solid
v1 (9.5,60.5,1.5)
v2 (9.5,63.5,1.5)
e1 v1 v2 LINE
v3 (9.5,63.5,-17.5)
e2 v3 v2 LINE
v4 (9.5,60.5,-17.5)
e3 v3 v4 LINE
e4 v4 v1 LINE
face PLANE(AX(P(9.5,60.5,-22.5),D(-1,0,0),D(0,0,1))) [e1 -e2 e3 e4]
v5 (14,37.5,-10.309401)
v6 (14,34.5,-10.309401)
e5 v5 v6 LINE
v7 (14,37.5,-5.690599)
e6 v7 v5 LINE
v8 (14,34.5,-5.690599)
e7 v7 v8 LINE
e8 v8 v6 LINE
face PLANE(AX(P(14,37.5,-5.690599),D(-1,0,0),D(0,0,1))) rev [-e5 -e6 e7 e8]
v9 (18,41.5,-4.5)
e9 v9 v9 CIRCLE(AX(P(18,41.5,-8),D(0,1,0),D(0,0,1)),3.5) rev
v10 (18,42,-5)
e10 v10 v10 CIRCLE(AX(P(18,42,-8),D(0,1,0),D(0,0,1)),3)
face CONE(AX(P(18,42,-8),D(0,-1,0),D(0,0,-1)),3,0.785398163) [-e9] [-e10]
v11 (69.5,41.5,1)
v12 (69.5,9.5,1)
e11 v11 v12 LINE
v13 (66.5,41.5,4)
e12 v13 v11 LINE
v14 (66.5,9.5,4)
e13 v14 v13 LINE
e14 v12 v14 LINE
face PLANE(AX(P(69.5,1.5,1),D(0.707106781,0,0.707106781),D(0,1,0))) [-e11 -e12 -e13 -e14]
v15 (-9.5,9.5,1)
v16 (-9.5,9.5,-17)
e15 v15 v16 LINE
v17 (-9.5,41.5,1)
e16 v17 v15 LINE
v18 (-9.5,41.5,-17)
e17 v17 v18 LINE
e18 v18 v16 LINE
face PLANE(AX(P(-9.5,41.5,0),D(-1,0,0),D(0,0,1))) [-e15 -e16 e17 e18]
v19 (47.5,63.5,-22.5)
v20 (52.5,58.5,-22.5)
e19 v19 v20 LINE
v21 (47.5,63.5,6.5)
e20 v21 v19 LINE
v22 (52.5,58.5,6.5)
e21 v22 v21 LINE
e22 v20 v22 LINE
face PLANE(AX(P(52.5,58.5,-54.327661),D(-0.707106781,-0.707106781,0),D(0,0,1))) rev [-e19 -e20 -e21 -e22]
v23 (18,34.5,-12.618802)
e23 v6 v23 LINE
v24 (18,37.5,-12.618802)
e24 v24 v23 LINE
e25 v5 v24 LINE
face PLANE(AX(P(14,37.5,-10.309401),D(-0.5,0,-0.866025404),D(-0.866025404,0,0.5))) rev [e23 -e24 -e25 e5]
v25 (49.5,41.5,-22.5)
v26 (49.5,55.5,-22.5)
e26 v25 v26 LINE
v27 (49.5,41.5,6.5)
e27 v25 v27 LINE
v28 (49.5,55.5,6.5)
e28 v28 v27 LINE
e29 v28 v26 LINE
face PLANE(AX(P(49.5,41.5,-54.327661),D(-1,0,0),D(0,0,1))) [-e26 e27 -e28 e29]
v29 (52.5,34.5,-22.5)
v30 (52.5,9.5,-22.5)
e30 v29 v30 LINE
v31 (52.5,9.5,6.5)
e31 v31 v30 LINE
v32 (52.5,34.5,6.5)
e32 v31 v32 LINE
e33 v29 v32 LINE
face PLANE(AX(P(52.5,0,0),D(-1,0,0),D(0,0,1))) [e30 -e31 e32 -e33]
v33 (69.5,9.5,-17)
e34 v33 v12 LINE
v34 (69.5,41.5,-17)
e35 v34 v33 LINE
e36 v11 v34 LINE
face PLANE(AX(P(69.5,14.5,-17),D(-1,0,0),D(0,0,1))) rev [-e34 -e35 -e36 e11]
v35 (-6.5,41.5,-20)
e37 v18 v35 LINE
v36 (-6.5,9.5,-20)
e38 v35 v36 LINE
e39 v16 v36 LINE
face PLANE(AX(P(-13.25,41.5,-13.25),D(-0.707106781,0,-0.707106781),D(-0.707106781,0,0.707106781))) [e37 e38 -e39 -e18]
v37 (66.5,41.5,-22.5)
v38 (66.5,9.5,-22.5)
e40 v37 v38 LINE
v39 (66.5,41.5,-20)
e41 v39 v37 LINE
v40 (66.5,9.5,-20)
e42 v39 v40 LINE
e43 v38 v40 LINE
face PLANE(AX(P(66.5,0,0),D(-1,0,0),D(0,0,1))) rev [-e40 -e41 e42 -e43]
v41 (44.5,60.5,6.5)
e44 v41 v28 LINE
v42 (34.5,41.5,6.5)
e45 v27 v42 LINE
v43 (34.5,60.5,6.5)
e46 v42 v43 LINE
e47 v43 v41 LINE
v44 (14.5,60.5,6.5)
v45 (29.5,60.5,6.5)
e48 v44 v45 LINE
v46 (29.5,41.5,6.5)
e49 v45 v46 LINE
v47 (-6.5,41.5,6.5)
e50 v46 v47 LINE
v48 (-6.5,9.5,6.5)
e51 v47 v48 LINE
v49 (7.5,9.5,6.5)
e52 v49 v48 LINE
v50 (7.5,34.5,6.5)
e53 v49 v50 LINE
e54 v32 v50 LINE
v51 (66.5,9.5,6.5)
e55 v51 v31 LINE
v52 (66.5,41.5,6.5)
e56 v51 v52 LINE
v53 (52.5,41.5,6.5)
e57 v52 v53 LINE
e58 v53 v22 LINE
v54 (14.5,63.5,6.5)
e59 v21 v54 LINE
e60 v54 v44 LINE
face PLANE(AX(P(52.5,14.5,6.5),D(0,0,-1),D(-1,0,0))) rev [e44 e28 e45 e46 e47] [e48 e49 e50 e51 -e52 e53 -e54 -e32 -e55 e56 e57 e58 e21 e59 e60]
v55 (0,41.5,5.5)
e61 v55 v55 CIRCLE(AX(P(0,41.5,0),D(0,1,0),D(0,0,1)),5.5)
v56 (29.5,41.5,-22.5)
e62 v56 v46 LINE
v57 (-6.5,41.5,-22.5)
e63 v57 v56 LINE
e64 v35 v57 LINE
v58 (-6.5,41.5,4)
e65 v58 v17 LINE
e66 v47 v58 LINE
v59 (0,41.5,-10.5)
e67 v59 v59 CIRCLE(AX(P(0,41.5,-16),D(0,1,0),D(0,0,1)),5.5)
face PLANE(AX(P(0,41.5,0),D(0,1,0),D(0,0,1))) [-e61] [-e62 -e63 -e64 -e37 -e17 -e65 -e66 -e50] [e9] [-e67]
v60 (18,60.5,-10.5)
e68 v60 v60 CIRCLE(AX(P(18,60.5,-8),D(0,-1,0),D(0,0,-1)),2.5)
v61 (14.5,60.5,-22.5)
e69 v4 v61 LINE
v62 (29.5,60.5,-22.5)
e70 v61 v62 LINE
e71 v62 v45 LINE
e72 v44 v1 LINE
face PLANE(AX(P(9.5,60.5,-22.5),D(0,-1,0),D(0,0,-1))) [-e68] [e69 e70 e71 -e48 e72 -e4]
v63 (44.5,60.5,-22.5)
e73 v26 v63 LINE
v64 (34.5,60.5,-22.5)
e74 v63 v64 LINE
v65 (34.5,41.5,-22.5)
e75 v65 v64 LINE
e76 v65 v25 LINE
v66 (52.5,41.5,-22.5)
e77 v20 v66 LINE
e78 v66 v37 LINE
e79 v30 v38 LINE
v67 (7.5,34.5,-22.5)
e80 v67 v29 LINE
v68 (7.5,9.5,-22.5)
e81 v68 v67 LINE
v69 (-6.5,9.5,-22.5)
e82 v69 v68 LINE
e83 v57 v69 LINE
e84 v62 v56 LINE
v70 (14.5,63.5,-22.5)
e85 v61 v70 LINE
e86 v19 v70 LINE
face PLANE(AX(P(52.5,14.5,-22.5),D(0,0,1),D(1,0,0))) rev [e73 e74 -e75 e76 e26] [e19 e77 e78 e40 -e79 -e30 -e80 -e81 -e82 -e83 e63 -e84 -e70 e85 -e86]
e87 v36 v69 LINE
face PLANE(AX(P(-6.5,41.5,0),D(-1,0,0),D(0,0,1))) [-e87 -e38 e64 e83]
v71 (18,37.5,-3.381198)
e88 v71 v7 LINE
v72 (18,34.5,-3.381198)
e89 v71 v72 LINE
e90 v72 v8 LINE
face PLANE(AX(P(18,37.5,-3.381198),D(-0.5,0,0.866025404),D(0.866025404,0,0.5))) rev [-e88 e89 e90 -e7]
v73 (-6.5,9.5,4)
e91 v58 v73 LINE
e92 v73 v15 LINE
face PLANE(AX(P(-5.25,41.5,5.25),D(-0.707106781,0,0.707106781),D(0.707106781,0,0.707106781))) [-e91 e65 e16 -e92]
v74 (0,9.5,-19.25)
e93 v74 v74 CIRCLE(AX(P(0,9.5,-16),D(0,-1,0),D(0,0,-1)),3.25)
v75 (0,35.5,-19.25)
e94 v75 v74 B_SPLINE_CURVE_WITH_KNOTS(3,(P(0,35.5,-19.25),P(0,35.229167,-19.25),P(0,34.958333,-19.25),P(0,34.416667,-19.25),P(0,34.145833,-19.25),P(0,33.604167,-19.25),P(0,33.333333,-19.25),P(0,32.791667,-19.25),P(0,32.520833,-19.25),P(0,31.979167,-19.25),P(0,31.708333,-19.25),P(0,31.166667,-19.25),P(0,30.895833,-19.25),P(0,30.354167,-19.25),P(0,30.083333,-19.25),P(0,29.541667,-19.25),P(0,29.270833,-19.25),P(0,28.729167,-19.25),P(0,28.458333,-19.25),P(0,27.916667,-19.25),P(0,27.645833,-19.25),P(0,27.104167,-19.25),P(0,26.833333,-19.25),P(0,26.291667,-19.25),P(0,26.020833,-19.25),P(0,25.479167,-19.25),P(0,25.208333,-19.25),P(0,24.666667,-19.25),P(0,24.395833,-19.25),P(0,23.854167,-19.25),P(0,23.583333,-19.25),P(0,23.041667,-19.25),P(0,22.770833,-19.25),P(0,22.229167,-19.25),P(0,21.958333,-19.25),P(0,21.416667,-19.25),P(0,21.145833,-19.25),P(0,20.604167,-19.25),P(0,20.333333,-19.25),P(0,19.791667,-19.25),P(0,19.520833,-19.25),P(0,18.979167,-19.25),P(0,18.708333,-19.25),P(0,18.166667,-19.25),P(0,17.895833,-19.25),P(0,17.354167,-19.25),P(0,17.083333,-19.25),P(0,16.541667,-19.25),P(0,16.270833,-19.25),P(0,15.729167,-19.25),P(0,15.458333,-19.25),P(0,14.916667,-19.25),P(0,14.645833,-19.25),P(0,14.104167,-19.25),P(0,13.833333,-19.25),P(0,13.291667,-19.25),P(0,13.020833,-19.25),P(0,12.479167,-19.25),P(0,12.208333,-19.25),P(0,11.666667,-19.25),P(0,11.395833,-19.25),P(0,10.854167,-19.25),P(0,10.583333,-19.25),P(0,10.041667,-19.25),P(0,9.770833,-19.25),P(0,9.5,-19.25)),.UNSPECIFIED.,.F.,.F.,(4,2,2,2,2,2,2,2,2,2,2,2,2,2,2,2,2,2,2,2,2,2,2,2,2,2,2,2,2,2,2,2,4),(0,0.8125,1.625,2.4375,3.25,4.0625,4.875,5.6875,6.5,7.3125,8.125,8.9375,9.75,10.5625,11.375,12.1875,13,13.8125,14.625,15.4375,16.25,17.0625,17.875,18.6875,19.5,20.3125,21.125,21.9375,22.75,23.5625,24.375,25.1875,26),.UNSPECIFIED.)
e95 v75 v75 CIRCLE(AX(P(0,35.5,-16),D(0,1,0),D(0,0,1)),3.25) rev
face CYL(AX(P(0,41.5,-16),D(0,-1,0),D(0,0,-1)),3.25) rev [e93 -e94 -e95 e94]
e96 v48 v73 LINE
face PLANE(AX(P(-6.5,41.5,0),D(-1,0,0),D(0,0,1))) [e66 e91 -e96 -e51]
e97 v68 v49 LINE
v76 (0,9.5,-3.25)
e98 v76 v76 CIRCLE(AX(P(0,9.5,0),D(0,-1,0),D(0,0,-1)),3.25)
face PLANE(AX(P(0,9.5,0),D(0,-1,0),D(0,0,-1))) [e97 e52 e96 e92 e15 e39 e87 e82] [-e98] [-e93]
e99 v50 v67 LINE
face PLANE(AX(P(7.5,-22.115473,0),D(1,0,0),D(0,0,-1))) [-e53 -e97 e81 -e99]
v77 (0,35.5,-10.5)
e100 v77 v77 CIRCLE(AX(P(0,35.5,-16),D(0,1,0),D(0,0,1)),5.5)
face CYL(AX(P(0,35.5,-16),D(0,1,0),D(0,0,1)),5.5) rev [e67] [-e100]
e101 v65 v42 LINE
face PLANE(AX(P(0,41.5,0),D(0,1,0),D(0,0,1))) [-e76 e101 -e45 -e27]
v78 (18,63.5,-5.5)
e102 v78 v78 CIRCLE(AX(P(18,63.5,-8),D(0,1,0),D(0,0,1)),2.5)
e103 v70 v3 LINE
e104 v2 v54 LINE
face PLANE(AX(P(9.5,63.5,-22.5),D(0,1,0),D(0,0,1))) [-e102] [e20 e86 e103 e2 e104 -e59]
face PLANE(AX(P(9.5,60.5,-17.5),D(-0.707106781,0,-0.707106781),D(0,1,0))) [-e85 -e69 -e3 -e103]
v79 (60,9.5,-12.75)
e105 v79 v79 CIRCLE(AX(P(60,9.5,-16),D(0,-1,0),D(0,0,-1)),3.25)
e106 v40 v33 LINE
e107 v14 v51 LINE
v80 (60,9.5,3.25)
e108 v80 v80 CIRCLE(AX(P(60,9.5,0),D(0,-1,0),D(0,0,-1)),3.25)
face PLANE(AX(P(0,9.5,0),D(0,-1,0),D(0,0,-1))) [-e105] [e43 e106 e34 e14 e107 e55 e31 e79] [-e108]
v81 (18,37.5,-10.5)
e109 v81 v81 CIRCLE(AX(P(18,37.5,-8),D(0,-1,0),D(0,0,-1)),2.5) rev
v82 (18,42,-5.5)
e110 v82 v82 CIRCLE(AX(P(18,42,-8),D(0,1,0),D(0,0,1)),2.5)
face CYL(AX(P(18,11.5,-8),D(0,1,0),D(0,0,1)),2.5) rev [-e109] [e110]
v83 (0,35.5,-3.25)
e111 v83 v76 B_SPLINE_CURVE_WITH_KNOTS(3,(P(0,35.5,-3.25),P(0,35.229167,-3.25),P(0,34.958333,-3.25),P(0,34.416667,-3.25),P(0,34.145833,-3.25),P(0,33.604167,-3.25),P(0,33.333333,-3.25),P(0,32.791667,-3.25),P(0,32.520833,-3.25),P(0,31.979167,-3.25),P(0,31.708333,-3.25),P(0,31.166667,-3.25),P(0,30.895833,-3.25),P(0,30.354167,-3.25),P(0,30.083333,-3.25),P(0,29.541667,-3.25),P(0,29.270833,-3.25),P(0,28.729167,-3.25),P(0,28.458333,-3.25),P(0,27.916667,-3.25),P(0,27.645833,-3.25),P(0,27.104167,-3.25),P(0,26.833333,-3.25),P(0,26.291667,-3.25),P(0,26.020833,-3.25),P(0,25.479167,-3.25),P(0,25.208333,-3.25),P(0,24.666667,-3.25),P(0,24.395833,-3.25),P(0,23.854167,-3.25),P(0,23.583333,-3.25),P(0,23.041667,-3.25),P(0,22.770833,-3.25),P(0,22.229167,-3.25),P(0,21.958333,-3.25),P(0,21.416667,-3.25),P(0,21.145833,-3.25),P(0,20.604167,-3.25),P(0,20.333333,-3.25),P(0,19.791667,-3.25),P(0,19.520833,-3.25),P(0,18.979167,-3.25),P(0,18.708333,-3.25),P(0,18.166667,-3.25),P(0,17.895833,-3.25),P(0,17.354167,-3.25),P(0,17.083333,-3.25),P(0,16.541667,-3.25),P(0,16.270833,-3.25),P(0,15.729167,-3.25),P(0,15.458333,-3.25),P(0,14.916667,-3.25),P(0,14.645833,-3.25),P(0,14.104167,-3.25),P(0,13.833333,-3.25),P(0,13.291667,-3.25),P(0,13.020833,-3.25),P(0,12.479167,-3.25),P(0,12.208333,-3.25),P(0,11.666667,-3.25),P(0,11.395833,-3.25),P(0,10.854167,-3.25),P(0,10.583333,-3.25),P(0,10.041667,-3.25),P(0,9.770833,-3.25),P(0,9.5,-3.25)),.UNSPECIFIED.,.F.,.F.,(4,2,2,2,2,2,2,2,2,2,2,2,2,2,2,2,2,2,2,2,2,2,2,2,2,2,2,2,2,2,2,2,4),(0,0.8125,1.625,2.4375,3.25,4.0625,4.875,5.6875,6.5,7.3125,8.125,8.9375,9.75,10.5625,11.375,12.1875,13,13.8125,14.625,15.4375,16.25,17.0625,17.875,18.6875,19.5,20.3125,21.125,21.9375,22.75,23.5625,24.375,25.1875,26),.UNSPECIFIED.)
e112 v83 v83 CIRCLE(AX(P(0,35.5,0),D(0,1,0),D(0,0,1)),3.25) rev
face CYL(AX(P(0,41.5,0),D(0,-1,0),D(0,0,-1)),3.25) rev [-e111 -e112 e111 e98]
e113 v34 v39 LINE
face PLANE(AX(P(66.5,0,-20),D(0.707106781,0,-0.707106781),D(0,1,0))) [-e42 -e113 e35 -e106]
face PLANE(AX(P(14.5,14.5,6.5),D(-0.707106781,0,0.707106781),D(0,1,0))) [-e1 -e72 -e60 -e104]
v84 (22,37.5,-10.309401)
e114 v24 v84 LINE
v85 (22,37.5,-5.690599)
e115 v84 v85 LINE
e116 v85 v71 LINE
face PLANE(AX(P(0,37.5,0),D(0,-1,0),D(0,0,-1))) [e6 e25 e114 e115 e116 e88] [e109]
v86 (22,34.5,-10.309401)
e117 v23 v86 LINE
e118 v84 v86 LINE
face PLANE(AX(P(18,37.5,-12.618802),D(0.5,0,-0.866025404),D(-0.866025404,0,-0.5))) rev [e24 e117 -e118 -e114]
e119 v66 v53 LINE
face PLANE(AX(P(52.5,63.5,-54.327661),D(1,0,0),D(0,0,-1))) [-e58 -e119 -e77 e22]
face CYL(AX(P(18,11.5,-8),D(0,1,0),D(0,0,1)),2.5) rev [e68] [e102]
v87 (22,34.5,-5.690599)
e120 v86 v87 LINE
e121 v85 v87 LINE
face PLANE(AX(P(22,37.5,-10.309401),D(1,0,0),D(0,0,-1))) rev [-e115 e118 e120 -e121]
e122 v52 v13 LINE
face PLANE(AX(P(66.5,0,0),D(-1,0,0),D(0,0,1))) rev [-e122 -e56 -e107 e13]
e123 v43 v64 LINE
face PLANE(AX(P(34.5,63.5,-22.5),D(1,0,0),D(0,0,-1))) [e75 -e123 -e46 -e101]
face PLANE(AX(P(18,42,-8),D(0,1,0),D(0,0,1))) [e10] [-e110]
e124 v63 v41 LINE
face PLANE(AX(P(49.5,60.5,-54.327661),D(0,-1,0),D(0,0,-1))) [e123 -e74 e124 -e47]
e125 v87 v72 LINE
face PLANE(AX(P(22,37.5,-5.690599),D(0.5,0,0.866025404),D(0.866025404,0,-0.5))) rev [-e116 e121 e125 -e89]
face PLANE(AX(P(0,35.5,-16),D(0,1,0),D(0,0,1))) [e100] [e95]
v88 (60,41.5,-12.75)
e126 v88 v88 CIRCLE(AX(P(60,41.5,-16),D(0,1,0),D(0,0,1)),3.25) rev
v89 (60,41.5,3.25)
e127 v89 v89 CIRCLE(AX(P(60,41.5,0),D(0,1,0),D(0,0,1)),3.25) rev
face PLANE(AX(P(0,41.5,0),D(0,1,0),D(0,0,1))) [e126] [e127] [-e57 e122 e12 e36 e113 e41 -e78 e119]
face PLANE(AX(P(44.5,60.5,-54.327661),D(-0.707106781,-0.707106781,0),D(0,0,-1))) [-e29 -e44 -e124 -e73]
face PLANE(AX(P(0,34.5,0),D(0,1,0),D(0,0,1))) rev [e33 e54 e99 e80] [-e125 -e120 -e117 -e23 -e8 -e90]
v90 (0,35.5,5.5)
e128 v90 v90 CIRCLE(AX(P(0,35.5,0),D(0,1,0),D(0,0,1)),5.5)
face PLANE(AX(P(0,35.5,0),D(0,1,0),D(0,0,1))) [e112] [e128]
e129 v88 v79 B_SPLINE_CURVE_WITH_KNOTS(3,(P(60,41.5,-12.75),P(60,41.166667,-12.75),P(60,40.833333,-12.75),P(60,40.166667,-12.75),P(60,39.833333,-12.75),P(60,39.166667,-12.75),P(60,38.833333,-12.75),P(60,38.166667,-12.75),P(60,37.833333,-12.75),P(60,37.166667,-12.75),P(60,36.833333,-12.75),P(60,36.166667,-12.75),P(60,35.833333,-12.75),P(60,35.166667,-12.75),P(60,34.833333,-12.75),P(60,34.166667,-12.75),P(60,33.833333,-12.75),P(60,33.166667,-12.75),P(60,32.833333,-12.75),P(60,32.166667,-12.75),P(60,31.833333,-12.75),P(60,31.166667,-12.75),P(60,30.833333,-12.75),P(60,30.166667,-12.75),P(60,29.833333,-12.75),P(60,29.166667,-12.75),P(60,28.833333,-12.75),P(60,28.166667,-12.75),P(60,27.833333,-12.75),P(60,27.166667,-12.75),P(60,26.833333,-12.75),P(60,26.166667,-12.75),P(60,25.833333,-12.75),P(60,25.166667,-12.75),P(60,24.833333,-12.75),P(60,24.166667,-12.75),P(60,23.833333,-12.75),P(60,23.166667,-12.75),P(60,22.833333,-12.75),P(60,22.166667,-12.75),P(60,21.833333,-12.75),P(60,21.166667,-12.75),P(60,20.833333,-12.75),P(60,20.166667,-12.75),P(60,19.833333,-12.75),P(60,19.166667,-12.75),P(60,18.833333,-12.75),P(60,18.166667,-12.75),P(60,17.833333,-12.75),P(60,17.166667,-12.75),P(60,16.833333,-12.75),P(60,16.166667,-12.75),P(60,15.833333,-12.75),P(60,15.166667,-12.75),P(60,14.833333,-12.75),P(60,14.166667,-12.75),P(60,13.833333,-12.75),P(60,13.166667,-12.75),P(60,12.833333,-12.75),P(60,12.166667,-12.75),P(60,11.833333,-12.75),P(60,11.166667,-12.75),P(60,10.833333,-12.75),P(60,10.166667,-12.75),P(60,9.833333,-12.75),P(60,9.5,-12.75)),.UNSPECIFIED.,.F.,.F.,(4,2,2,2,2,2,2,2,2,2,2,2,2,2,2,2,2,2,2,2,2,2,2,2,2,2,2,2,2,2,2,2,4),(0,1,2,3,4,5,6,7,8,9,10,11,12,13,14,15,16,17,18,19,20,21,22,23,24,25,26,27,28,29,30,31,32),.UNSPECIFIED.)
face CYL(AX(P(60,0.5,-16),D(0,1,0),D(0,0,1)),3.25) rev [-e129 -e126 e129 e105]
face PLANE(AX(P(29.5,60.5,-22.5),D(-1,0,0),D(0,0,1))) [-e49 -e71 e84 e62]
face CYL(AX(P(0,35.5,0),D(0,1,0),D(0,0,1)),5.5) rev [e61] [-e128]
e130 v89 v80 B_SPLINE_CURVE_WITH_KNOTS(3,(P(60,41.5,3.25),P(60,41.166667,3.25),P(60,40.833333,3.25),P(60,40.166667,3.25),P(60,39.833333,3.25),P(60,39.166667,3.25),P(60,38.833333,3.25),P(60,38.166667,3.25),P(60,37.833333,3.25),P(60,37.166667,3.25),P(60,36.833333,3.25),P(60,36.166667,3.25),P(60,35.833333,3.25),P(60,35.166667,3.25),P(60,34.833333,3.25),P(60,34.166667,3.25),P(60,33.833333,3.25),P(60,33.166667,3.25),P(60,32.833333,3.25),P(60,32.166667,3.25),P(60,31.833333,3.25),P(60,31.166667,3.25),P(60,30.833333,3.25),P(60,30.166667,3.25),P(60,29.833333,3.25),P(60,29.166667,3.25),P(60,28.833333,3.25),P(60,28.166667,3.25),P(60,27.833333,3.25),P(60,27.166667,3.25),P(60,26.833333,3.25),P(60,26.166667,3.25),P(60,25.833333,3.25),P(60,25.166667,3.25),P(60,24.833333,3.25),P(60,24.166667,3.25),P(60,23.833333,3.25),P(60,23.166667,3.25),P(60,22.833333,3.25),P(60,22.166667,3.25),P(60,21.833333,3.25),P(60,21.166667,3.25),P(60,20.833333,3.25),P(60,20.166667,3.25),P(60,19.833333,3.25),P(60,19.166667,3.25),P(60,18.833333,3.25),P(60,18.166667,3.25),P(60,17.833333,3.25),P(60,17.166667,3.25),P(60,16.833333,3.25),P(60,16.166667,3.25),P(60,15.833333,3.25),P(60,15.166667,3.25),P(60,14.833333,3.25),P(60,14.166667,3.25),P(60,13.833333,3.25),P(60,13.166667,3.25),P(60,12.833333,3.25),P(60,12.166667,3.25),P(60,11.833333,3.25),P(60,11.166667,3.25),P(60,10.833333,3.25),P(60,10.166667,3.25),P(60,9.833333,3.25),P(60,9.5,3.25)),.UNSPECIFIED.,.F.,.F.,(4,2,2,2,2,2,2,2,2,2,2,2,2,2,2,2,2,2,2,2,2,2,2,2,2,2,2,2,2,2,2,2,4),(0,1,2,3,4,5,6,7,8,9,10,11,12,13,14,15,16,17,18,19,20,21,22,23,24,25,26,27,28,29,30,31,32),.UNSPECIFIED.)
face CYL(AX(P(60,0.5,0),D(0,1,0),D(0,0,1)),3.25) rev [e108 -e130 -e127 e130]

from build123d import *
from build123d.topology import SkipClean

# Parameters (mm, degrees)
SKETCH1_W               = 44.05184454
SKETCH1_H               = 18
BOSS_EXTRUDE1_DEPTH     = 1.5
SKETCH2_W               = 3
SKETCH2_H               = 18
BOSS_EXTRUDE2_DEPTH     = 13
SKETCH3_W               = 29
SKETCH3_H               = 3
BOSS_EXTRUDE3_DEPTH     = 14
CHAMFER1_SIZE           = 3
SKETCH4_R               = 3.25
CUT_EXTRUDE1_DEPTH      = 14
BOSS_EXTRUDE4_START     = 20
SKETCH5_R               = 3.25
BOSS_EXTRUDE4_DEPTH     = 20
BOSS_EXTRUDE5_START     = 7
SKETCH6_R               = 3.25
SKETCH6_W               = 22.5
SKETCH6_H               = 29
BOSS_EXTRUDE5_DEPTH     = 7
SKETCH8_R               = 3.25
BOSS_EXTRUDE6_DEPTH     = 23
BOSS_EXTRUDE8_DEPTH     = 29
SKETCH9_R               = 38.719812757
CUT_EXTRUDE2_DEPTH      = 11.5
CUT_EXTRUDE3_DEPTH      = 79.971513852
CUT_EXTRUDE3_DEPTH_BACK = 79.971513852
SKETCH10_R              = 2.5
CUT_EXTRUDE4_DEPTH      = 3
SKETCH12_R              = 3
SKETCH12_R_2            = 2.5
BOSS_EXTRUDE7_DEPTH     = 0.5
CHAMFER2_SIZE           = 0.5
SKETCH17_R              = 5.5
CUT_EXTRUDE5_DEPTH      = 6
CHAMFER3_SIZE           = 5
BOSS_EXTRUDE9_DEPTH     = 29
CHAMFER4_SIZE           = 5
SKETCH20_R              = 3.25
BOSS_EXTRUDE10_DEPTH    = 2


with BuildPart() as part:
    # Sketch1 → Boss-Extrude1 (new body)
    with BuildSketch(Plane(origin=(0, 0, 0), x_dir=(1, 0, 0), z_dir=(0, 1, 0))):
        with Locations((88.52592227, 8)):
            Rectangle(SKETCH1_W, SKETCH1_H)
        with BuildLine():
            Line((99.736944586, 5.75), (95.736944586, 5.75))
            ThreePointArc((95.736944586, 5.75), (93.486944586, 8), (95.736944586, 10.25))
            Line((95.736944586, 10.25), (99.736944586, 10.25))
            ThreePointArc((99.736944586, 10.25), (101.986944586, 8), (99.736944586, 5.75))
        make_face(mode=Mode.SUBTRACT)
    extrude(amount=BOSS_EXTRUDE1_DEPTH)

    # Sketch2 → Boss-Extrude2 (add)
    with BuildSketch(Plane(origin=(0, 1.5, 0), x_dir=(1, 0, 0), z_dir=(0, 1, 0))):
        with Locations((68, 8)):
            Rectangle(SKETCH2_W, SKETCH2_H)
    extrude(amount=BOSS_EXTRUDE2_DEPTH)

    # Sketch3 → Boss-Extrude3 (add)
    with BuildSketch(Plane.ZY.offset(-66.5)):
        with Locations((-8, 13)):
            Rectangle(SKETCH3_W, SKETCH3_H)
    extrude(amount=BOSS_EXTRUDE3_DEPTH)

    # Chamfer1
    chamfer1_edges = [part.edges().sort_by_distance(p)[0] for p in [
        (66.5, 13, 1),
        (66.5, 13, -17),
    ]]
    chamfer(chamfer1_edges, length=CHAMFER1_SIZE - 0.0001)  # a hair under: the kernel refuses the full size

    # Sketch4 → Cut-Extrude1 (cut)
    with BuildSketch(Plane(origin=(0, 14.5, 0), x_dir=(1, 0, 0), z_dir=(0, 1, 0))):
        with Locations(Location((60, 16, 0), (0, 0, 270))):
            Circle(SKETCH4_R)
        with Locations(Location((60, 0, 0), (0, 0, 270))):
            Circle(SKETCH4_R)
    extrude(amount=-CUT_EXTRUDE1_DEPTH, mode=Mode.SUBTRACT)

    # Sketch5 → Boss-Extrude4 (add)
    with SkipClean():  # the faces are left unmerged after this step: merging them gives an invalid solid
        with BuildSketch(Plane(origin=(0, 14.5, 0), x_dir=(1, 0, 0), z_dir=(0, 1, 0)).offset(BOSS_EXTRUDE4_START)):
            Polygon((69.5, -1), (69.5, 17), (66.5, 20), (66.5, 22.5), (52.5, 22.5), (52.5, -6.5), (66.5, -6.5), (66.5, -4), align=None)
            with Locations(Location((60, 16, 0), (0, 0, 270))):
                Circle(SKETCH5_R, mode=Mode.SUBTRACT)
            with Locations(Location((60, 0, 0), (0, 0, 270))):
                Circle(SKETCH5_R, mode=Mode.SUBTRACT)
        extrude(amount=-BOSS_EXTRUDE4_DEPTH)

    # Sketch6 → Boss-Extrude5 (add)
    # profile 1 of 3: a face of its own
    with BuildSketch(Plane(origin=(0, 34.5, 0), x_dir=(1, 0, 0), z_dir=(0, 1, 0)).offset(BOSS_EXTRUDE5_START)):
        Polygon((30, -6.5), (30, 22.5), (7.5, 22.5), (-6.5, 22.5), (-6.5, 20), (-9.5, 17), (-9.5, -1), (-6.5, -4), (-6.5, -6.5), (7.5, -6.5), align=None)
        with Locations(Location((0, 0, 0), (0, 0, 90))):
            Circle(SKETCH6_R, mode=Mode.SUBTRACT)
        with Locations(Location((0, 16, 0), (0, 0, 90))):
            Circle(SKETCH6_R, mode=Mode.SUBTRACT)
    # profile 2 of 3: a face of its own
    with BuildSketch(Plane(origin=(0, 34.5, 0), x_dir=(1, 0, 0), z_dir=(0, 1, 0)).offset(BOSS_EXTRUDE5_START)):
        with Locations((41.25, 8)):
            Rectangle(SKETCH6_W, SKETCH6_H)
    # profile 3 of 3: a face of its own
    with BuildSketch(Plane(origin=(0, 34.5, 0), x_dir=(1, 0, 0), z_dir=(0, 1, 0)).offset(BOSS_EXTRUDE5_START)):
        Polygon((66.5, -6.5), (66.5, -4), (69.5, -1), (69.5, 17), (66.5, 20), (66.5, 22.5), (52.5, 22.5), (52.5, -6.5), align=None)
        with Locations(Location((60, 0, 0), (0, 0, 270))):
            Circle(SKETCH6_R, mode=Mode.SUBTRACT)
        with Locations(Location((60, 16, 0), (0, 0, 270))):
            Circle(SKETCH6_R, mode=Mode.SUBTRACT)
    extrude(amount=-BOSS_EXTRUDE5_DEPTH)

    # Sketch8 → Boss-Extrude6 (add)
    with BuildSketch(Plane.XZ.offset(-34.5)):
        Polygon((7.5, -22.5), (7.5, 6.5), (-6.5, 6.5), (-6.5, 4), (-9.5, 1), (-9.5, -17), (-6.5, -20), (-6.5, -22.5), align=None)
        with Locations(Location((0, -16, 0), (0, 0, 270))):
            Circle(SKETCH8_R, mode=Mode.SUBTRACT)
        with Locations(Location((0, 0, 0), (0, 0, 270))):
            Circle(SKETCH8_R, mode=Mode.SUBTRACT)
    extrude(amount=BOSS_EXTRUDE6_DEPTH)

    # Sketch18 → Boss-Extrude8 (add)
    with BuildSketch(Plane.XY.offset(6.5)):
        Polygon((9.5, 60.5), (29.5, 60.5), (29.5, 41.5), (34.5, 41.5), (34.5, 63.5), (9.5, 63.5), align=None)
    extrude(amount=-BOSS_EXTRUDE8_DEPTH)

    # Sketch9 → Cut-Extrude2 (cut)
    with BuildSketch(Plane(origin=(0, 0, 0), x_dir=(-1, 0, 0), z_dir=(0, -1, 0))):
        with Locations((-87.720791246, 8.661967718)):
            Circle(SKETCH9_R)
    extrude(amount=-CUT_EXTRUDE2_DEPTH, mode=Mode.SUBTRACT)

    # Sketch10 → Cut-Extrude3 (cut, two sides: drawn at the far end of the back side and taken through both)
    with BuildSketch(Plane(origin=(0, 41.5, 0), x_dir=(1, 0, 0), z_dir=(0, 1, 0)).offset(-CUT_EXTRUDE3_DEPTH_BACK)):
        with Locations(Location((18, 8, 0), (0, 0, 270))):
            Circle(SKETCH10_R)
    extrude(amount=CUT_EXTRUDE3_DEPTH + CUT_EXTRUDE3_DEPTH_BACK, mode=Mode.SUBTRACT)

    # Sketch11 → Cut-Extrude4 (cut)
    with BuildSketch(Plane(origin=(0, 34.5, 0), x_dir=(-1, 0, 0), z_dir=(0, -1, 0))):
        Polygon((-18, 3.381197846), (-14, 5.690598923), (-14, 10.309401077), (-18, 12.618802154), (-22, 10.309401077), (-22, 5.690598923), align=None)
    extrude(amount=-CUT_EXTRUDE4_DEPTH, mode=Mode.SUBTRACT)

    # Sketch12 → Boss-Extrude7 (add)
    with BuildSketch(Plane(origin=(0, 41.5, 0), x_dir=(1, 0, 0), z_dir=(0, 1, 0))):
        with Locations(Location((18, 8, 0), (0, 0, 270))):
            Circle(SKETCH12_R)
        with Locations(Location((18, 8, 0), (0, 0, 270))):
            Circle(SKETCH12_R_2, mode=Mode.SUBTRACT)
    extrude(amount=BOSS_EXTRUDE7_DEPTH)

    # Chamfer2
    chamfer2_edges = [part.edges().sort_by_distance(p)[0] for p in [
        (18, 41.5, -11),
    ]]
    chamfer(chamfer2_edges, length=CHAMFER2_SIZE - 0.0001)  # a hair under: the kernel refuses the full size

    # Sketch17 → Cut-Extrude5 (cut)
    with BuildSketch(Plane(origin=(0, 41.5, 0), x_dir=(1, 0, 0), z_dir=(0, 1, 0))):
        with Locations(Location((0, 16, 0), (0, 0, 270))):
            Circle(SKETCH17_R)
        with Locations(Location((0, 0, 0), (0, 0, 270))):
            Circle(SKETCH17_R)
    extrude(amount=-CUT_EXTRUDE5_DEPTH, mode=Mode.SUBTRACT)

    # Chamfer3
    chamfer3_edges = [part.edges().sort_by_distance(p)[0] for p in [
        (9.5, 62, -22.5),
        (9.5, 62, 6.5),
    ]]
    chamfer(chamfer3_edges, length=CHAMFER3_SIZE)

    # Sketch19 → Boss-Extrude9 (add)
    with BuildSketch(Plane.XY.offset(6.5)):
        Polygon((34.5, 63.5), (52.5, 63.5), (52.5, 41.5), (49.5, 41.5), (49.5, 60.5), (29.5, 60.5), align=None)
    extrude(amount=-BOSS_EXTRUDE9_DEPTH)

    # Chamfer4
    chamfer4_edges = [part.edges().sort_by_distance(p)[0] for p in [
        (52.5, 63.5, -8),
        (49.5, 60.5, -8),
    ]]
    chamfer(chamfer4_edges, length=CHAMFER4_SIZE)

    # Sketch20 → Boss-Extrude10 (add)
    # profile 1 of 2: a face of its own
    with SkipClean():  # the faces are left unmerged after this step: merging them gives an invalid solid
        with BuildSketch(Plane.XZ.offset(-11.5)):
            Polygon((66.5, -20), (69.5, -17), (69.5, 1), (66.5, 4), (66.5, 6.5), (52.5, 6.5), (52.5, -22.5), (66.5, -22.5), align=None)
            with Locations(Location((60, 0, 0), (0, 0, 90))):
                Circle(SKETCH20_R, mode=Mode.SUBTRACT)
            with Locations(Location((60, -16, 0), (0, 0, 90))):
                Circle(SKETCH20_R, mode=Mode.SUBTRACT)
        # profile 2 of 2: a face of its own
        with BuildSketch(Plane.XZ.offset(-11.5)):
            Polygon((7.5, -22.5), (7.5, 6.5), (-6.5, 6.5), (-6.5, 4), (-9.5, 1), (-9.5, -17), (-6.5, -20), (-6.5, -22.5), align=None)
            with Locations(Location((0, 0, 0), (0, 0, 270))):
                Circle(SKETCH20_R, mode=Mode.SUBTRACT)
            with Locations(Location((0, -16, 0), (0, 0, 270))):
                Circle(SKETCH20_R, mode=Mode.SUBTRACT)
        extrude(amount=BOSS_EXTRUDE10_DEPTH)


solid = part.part
